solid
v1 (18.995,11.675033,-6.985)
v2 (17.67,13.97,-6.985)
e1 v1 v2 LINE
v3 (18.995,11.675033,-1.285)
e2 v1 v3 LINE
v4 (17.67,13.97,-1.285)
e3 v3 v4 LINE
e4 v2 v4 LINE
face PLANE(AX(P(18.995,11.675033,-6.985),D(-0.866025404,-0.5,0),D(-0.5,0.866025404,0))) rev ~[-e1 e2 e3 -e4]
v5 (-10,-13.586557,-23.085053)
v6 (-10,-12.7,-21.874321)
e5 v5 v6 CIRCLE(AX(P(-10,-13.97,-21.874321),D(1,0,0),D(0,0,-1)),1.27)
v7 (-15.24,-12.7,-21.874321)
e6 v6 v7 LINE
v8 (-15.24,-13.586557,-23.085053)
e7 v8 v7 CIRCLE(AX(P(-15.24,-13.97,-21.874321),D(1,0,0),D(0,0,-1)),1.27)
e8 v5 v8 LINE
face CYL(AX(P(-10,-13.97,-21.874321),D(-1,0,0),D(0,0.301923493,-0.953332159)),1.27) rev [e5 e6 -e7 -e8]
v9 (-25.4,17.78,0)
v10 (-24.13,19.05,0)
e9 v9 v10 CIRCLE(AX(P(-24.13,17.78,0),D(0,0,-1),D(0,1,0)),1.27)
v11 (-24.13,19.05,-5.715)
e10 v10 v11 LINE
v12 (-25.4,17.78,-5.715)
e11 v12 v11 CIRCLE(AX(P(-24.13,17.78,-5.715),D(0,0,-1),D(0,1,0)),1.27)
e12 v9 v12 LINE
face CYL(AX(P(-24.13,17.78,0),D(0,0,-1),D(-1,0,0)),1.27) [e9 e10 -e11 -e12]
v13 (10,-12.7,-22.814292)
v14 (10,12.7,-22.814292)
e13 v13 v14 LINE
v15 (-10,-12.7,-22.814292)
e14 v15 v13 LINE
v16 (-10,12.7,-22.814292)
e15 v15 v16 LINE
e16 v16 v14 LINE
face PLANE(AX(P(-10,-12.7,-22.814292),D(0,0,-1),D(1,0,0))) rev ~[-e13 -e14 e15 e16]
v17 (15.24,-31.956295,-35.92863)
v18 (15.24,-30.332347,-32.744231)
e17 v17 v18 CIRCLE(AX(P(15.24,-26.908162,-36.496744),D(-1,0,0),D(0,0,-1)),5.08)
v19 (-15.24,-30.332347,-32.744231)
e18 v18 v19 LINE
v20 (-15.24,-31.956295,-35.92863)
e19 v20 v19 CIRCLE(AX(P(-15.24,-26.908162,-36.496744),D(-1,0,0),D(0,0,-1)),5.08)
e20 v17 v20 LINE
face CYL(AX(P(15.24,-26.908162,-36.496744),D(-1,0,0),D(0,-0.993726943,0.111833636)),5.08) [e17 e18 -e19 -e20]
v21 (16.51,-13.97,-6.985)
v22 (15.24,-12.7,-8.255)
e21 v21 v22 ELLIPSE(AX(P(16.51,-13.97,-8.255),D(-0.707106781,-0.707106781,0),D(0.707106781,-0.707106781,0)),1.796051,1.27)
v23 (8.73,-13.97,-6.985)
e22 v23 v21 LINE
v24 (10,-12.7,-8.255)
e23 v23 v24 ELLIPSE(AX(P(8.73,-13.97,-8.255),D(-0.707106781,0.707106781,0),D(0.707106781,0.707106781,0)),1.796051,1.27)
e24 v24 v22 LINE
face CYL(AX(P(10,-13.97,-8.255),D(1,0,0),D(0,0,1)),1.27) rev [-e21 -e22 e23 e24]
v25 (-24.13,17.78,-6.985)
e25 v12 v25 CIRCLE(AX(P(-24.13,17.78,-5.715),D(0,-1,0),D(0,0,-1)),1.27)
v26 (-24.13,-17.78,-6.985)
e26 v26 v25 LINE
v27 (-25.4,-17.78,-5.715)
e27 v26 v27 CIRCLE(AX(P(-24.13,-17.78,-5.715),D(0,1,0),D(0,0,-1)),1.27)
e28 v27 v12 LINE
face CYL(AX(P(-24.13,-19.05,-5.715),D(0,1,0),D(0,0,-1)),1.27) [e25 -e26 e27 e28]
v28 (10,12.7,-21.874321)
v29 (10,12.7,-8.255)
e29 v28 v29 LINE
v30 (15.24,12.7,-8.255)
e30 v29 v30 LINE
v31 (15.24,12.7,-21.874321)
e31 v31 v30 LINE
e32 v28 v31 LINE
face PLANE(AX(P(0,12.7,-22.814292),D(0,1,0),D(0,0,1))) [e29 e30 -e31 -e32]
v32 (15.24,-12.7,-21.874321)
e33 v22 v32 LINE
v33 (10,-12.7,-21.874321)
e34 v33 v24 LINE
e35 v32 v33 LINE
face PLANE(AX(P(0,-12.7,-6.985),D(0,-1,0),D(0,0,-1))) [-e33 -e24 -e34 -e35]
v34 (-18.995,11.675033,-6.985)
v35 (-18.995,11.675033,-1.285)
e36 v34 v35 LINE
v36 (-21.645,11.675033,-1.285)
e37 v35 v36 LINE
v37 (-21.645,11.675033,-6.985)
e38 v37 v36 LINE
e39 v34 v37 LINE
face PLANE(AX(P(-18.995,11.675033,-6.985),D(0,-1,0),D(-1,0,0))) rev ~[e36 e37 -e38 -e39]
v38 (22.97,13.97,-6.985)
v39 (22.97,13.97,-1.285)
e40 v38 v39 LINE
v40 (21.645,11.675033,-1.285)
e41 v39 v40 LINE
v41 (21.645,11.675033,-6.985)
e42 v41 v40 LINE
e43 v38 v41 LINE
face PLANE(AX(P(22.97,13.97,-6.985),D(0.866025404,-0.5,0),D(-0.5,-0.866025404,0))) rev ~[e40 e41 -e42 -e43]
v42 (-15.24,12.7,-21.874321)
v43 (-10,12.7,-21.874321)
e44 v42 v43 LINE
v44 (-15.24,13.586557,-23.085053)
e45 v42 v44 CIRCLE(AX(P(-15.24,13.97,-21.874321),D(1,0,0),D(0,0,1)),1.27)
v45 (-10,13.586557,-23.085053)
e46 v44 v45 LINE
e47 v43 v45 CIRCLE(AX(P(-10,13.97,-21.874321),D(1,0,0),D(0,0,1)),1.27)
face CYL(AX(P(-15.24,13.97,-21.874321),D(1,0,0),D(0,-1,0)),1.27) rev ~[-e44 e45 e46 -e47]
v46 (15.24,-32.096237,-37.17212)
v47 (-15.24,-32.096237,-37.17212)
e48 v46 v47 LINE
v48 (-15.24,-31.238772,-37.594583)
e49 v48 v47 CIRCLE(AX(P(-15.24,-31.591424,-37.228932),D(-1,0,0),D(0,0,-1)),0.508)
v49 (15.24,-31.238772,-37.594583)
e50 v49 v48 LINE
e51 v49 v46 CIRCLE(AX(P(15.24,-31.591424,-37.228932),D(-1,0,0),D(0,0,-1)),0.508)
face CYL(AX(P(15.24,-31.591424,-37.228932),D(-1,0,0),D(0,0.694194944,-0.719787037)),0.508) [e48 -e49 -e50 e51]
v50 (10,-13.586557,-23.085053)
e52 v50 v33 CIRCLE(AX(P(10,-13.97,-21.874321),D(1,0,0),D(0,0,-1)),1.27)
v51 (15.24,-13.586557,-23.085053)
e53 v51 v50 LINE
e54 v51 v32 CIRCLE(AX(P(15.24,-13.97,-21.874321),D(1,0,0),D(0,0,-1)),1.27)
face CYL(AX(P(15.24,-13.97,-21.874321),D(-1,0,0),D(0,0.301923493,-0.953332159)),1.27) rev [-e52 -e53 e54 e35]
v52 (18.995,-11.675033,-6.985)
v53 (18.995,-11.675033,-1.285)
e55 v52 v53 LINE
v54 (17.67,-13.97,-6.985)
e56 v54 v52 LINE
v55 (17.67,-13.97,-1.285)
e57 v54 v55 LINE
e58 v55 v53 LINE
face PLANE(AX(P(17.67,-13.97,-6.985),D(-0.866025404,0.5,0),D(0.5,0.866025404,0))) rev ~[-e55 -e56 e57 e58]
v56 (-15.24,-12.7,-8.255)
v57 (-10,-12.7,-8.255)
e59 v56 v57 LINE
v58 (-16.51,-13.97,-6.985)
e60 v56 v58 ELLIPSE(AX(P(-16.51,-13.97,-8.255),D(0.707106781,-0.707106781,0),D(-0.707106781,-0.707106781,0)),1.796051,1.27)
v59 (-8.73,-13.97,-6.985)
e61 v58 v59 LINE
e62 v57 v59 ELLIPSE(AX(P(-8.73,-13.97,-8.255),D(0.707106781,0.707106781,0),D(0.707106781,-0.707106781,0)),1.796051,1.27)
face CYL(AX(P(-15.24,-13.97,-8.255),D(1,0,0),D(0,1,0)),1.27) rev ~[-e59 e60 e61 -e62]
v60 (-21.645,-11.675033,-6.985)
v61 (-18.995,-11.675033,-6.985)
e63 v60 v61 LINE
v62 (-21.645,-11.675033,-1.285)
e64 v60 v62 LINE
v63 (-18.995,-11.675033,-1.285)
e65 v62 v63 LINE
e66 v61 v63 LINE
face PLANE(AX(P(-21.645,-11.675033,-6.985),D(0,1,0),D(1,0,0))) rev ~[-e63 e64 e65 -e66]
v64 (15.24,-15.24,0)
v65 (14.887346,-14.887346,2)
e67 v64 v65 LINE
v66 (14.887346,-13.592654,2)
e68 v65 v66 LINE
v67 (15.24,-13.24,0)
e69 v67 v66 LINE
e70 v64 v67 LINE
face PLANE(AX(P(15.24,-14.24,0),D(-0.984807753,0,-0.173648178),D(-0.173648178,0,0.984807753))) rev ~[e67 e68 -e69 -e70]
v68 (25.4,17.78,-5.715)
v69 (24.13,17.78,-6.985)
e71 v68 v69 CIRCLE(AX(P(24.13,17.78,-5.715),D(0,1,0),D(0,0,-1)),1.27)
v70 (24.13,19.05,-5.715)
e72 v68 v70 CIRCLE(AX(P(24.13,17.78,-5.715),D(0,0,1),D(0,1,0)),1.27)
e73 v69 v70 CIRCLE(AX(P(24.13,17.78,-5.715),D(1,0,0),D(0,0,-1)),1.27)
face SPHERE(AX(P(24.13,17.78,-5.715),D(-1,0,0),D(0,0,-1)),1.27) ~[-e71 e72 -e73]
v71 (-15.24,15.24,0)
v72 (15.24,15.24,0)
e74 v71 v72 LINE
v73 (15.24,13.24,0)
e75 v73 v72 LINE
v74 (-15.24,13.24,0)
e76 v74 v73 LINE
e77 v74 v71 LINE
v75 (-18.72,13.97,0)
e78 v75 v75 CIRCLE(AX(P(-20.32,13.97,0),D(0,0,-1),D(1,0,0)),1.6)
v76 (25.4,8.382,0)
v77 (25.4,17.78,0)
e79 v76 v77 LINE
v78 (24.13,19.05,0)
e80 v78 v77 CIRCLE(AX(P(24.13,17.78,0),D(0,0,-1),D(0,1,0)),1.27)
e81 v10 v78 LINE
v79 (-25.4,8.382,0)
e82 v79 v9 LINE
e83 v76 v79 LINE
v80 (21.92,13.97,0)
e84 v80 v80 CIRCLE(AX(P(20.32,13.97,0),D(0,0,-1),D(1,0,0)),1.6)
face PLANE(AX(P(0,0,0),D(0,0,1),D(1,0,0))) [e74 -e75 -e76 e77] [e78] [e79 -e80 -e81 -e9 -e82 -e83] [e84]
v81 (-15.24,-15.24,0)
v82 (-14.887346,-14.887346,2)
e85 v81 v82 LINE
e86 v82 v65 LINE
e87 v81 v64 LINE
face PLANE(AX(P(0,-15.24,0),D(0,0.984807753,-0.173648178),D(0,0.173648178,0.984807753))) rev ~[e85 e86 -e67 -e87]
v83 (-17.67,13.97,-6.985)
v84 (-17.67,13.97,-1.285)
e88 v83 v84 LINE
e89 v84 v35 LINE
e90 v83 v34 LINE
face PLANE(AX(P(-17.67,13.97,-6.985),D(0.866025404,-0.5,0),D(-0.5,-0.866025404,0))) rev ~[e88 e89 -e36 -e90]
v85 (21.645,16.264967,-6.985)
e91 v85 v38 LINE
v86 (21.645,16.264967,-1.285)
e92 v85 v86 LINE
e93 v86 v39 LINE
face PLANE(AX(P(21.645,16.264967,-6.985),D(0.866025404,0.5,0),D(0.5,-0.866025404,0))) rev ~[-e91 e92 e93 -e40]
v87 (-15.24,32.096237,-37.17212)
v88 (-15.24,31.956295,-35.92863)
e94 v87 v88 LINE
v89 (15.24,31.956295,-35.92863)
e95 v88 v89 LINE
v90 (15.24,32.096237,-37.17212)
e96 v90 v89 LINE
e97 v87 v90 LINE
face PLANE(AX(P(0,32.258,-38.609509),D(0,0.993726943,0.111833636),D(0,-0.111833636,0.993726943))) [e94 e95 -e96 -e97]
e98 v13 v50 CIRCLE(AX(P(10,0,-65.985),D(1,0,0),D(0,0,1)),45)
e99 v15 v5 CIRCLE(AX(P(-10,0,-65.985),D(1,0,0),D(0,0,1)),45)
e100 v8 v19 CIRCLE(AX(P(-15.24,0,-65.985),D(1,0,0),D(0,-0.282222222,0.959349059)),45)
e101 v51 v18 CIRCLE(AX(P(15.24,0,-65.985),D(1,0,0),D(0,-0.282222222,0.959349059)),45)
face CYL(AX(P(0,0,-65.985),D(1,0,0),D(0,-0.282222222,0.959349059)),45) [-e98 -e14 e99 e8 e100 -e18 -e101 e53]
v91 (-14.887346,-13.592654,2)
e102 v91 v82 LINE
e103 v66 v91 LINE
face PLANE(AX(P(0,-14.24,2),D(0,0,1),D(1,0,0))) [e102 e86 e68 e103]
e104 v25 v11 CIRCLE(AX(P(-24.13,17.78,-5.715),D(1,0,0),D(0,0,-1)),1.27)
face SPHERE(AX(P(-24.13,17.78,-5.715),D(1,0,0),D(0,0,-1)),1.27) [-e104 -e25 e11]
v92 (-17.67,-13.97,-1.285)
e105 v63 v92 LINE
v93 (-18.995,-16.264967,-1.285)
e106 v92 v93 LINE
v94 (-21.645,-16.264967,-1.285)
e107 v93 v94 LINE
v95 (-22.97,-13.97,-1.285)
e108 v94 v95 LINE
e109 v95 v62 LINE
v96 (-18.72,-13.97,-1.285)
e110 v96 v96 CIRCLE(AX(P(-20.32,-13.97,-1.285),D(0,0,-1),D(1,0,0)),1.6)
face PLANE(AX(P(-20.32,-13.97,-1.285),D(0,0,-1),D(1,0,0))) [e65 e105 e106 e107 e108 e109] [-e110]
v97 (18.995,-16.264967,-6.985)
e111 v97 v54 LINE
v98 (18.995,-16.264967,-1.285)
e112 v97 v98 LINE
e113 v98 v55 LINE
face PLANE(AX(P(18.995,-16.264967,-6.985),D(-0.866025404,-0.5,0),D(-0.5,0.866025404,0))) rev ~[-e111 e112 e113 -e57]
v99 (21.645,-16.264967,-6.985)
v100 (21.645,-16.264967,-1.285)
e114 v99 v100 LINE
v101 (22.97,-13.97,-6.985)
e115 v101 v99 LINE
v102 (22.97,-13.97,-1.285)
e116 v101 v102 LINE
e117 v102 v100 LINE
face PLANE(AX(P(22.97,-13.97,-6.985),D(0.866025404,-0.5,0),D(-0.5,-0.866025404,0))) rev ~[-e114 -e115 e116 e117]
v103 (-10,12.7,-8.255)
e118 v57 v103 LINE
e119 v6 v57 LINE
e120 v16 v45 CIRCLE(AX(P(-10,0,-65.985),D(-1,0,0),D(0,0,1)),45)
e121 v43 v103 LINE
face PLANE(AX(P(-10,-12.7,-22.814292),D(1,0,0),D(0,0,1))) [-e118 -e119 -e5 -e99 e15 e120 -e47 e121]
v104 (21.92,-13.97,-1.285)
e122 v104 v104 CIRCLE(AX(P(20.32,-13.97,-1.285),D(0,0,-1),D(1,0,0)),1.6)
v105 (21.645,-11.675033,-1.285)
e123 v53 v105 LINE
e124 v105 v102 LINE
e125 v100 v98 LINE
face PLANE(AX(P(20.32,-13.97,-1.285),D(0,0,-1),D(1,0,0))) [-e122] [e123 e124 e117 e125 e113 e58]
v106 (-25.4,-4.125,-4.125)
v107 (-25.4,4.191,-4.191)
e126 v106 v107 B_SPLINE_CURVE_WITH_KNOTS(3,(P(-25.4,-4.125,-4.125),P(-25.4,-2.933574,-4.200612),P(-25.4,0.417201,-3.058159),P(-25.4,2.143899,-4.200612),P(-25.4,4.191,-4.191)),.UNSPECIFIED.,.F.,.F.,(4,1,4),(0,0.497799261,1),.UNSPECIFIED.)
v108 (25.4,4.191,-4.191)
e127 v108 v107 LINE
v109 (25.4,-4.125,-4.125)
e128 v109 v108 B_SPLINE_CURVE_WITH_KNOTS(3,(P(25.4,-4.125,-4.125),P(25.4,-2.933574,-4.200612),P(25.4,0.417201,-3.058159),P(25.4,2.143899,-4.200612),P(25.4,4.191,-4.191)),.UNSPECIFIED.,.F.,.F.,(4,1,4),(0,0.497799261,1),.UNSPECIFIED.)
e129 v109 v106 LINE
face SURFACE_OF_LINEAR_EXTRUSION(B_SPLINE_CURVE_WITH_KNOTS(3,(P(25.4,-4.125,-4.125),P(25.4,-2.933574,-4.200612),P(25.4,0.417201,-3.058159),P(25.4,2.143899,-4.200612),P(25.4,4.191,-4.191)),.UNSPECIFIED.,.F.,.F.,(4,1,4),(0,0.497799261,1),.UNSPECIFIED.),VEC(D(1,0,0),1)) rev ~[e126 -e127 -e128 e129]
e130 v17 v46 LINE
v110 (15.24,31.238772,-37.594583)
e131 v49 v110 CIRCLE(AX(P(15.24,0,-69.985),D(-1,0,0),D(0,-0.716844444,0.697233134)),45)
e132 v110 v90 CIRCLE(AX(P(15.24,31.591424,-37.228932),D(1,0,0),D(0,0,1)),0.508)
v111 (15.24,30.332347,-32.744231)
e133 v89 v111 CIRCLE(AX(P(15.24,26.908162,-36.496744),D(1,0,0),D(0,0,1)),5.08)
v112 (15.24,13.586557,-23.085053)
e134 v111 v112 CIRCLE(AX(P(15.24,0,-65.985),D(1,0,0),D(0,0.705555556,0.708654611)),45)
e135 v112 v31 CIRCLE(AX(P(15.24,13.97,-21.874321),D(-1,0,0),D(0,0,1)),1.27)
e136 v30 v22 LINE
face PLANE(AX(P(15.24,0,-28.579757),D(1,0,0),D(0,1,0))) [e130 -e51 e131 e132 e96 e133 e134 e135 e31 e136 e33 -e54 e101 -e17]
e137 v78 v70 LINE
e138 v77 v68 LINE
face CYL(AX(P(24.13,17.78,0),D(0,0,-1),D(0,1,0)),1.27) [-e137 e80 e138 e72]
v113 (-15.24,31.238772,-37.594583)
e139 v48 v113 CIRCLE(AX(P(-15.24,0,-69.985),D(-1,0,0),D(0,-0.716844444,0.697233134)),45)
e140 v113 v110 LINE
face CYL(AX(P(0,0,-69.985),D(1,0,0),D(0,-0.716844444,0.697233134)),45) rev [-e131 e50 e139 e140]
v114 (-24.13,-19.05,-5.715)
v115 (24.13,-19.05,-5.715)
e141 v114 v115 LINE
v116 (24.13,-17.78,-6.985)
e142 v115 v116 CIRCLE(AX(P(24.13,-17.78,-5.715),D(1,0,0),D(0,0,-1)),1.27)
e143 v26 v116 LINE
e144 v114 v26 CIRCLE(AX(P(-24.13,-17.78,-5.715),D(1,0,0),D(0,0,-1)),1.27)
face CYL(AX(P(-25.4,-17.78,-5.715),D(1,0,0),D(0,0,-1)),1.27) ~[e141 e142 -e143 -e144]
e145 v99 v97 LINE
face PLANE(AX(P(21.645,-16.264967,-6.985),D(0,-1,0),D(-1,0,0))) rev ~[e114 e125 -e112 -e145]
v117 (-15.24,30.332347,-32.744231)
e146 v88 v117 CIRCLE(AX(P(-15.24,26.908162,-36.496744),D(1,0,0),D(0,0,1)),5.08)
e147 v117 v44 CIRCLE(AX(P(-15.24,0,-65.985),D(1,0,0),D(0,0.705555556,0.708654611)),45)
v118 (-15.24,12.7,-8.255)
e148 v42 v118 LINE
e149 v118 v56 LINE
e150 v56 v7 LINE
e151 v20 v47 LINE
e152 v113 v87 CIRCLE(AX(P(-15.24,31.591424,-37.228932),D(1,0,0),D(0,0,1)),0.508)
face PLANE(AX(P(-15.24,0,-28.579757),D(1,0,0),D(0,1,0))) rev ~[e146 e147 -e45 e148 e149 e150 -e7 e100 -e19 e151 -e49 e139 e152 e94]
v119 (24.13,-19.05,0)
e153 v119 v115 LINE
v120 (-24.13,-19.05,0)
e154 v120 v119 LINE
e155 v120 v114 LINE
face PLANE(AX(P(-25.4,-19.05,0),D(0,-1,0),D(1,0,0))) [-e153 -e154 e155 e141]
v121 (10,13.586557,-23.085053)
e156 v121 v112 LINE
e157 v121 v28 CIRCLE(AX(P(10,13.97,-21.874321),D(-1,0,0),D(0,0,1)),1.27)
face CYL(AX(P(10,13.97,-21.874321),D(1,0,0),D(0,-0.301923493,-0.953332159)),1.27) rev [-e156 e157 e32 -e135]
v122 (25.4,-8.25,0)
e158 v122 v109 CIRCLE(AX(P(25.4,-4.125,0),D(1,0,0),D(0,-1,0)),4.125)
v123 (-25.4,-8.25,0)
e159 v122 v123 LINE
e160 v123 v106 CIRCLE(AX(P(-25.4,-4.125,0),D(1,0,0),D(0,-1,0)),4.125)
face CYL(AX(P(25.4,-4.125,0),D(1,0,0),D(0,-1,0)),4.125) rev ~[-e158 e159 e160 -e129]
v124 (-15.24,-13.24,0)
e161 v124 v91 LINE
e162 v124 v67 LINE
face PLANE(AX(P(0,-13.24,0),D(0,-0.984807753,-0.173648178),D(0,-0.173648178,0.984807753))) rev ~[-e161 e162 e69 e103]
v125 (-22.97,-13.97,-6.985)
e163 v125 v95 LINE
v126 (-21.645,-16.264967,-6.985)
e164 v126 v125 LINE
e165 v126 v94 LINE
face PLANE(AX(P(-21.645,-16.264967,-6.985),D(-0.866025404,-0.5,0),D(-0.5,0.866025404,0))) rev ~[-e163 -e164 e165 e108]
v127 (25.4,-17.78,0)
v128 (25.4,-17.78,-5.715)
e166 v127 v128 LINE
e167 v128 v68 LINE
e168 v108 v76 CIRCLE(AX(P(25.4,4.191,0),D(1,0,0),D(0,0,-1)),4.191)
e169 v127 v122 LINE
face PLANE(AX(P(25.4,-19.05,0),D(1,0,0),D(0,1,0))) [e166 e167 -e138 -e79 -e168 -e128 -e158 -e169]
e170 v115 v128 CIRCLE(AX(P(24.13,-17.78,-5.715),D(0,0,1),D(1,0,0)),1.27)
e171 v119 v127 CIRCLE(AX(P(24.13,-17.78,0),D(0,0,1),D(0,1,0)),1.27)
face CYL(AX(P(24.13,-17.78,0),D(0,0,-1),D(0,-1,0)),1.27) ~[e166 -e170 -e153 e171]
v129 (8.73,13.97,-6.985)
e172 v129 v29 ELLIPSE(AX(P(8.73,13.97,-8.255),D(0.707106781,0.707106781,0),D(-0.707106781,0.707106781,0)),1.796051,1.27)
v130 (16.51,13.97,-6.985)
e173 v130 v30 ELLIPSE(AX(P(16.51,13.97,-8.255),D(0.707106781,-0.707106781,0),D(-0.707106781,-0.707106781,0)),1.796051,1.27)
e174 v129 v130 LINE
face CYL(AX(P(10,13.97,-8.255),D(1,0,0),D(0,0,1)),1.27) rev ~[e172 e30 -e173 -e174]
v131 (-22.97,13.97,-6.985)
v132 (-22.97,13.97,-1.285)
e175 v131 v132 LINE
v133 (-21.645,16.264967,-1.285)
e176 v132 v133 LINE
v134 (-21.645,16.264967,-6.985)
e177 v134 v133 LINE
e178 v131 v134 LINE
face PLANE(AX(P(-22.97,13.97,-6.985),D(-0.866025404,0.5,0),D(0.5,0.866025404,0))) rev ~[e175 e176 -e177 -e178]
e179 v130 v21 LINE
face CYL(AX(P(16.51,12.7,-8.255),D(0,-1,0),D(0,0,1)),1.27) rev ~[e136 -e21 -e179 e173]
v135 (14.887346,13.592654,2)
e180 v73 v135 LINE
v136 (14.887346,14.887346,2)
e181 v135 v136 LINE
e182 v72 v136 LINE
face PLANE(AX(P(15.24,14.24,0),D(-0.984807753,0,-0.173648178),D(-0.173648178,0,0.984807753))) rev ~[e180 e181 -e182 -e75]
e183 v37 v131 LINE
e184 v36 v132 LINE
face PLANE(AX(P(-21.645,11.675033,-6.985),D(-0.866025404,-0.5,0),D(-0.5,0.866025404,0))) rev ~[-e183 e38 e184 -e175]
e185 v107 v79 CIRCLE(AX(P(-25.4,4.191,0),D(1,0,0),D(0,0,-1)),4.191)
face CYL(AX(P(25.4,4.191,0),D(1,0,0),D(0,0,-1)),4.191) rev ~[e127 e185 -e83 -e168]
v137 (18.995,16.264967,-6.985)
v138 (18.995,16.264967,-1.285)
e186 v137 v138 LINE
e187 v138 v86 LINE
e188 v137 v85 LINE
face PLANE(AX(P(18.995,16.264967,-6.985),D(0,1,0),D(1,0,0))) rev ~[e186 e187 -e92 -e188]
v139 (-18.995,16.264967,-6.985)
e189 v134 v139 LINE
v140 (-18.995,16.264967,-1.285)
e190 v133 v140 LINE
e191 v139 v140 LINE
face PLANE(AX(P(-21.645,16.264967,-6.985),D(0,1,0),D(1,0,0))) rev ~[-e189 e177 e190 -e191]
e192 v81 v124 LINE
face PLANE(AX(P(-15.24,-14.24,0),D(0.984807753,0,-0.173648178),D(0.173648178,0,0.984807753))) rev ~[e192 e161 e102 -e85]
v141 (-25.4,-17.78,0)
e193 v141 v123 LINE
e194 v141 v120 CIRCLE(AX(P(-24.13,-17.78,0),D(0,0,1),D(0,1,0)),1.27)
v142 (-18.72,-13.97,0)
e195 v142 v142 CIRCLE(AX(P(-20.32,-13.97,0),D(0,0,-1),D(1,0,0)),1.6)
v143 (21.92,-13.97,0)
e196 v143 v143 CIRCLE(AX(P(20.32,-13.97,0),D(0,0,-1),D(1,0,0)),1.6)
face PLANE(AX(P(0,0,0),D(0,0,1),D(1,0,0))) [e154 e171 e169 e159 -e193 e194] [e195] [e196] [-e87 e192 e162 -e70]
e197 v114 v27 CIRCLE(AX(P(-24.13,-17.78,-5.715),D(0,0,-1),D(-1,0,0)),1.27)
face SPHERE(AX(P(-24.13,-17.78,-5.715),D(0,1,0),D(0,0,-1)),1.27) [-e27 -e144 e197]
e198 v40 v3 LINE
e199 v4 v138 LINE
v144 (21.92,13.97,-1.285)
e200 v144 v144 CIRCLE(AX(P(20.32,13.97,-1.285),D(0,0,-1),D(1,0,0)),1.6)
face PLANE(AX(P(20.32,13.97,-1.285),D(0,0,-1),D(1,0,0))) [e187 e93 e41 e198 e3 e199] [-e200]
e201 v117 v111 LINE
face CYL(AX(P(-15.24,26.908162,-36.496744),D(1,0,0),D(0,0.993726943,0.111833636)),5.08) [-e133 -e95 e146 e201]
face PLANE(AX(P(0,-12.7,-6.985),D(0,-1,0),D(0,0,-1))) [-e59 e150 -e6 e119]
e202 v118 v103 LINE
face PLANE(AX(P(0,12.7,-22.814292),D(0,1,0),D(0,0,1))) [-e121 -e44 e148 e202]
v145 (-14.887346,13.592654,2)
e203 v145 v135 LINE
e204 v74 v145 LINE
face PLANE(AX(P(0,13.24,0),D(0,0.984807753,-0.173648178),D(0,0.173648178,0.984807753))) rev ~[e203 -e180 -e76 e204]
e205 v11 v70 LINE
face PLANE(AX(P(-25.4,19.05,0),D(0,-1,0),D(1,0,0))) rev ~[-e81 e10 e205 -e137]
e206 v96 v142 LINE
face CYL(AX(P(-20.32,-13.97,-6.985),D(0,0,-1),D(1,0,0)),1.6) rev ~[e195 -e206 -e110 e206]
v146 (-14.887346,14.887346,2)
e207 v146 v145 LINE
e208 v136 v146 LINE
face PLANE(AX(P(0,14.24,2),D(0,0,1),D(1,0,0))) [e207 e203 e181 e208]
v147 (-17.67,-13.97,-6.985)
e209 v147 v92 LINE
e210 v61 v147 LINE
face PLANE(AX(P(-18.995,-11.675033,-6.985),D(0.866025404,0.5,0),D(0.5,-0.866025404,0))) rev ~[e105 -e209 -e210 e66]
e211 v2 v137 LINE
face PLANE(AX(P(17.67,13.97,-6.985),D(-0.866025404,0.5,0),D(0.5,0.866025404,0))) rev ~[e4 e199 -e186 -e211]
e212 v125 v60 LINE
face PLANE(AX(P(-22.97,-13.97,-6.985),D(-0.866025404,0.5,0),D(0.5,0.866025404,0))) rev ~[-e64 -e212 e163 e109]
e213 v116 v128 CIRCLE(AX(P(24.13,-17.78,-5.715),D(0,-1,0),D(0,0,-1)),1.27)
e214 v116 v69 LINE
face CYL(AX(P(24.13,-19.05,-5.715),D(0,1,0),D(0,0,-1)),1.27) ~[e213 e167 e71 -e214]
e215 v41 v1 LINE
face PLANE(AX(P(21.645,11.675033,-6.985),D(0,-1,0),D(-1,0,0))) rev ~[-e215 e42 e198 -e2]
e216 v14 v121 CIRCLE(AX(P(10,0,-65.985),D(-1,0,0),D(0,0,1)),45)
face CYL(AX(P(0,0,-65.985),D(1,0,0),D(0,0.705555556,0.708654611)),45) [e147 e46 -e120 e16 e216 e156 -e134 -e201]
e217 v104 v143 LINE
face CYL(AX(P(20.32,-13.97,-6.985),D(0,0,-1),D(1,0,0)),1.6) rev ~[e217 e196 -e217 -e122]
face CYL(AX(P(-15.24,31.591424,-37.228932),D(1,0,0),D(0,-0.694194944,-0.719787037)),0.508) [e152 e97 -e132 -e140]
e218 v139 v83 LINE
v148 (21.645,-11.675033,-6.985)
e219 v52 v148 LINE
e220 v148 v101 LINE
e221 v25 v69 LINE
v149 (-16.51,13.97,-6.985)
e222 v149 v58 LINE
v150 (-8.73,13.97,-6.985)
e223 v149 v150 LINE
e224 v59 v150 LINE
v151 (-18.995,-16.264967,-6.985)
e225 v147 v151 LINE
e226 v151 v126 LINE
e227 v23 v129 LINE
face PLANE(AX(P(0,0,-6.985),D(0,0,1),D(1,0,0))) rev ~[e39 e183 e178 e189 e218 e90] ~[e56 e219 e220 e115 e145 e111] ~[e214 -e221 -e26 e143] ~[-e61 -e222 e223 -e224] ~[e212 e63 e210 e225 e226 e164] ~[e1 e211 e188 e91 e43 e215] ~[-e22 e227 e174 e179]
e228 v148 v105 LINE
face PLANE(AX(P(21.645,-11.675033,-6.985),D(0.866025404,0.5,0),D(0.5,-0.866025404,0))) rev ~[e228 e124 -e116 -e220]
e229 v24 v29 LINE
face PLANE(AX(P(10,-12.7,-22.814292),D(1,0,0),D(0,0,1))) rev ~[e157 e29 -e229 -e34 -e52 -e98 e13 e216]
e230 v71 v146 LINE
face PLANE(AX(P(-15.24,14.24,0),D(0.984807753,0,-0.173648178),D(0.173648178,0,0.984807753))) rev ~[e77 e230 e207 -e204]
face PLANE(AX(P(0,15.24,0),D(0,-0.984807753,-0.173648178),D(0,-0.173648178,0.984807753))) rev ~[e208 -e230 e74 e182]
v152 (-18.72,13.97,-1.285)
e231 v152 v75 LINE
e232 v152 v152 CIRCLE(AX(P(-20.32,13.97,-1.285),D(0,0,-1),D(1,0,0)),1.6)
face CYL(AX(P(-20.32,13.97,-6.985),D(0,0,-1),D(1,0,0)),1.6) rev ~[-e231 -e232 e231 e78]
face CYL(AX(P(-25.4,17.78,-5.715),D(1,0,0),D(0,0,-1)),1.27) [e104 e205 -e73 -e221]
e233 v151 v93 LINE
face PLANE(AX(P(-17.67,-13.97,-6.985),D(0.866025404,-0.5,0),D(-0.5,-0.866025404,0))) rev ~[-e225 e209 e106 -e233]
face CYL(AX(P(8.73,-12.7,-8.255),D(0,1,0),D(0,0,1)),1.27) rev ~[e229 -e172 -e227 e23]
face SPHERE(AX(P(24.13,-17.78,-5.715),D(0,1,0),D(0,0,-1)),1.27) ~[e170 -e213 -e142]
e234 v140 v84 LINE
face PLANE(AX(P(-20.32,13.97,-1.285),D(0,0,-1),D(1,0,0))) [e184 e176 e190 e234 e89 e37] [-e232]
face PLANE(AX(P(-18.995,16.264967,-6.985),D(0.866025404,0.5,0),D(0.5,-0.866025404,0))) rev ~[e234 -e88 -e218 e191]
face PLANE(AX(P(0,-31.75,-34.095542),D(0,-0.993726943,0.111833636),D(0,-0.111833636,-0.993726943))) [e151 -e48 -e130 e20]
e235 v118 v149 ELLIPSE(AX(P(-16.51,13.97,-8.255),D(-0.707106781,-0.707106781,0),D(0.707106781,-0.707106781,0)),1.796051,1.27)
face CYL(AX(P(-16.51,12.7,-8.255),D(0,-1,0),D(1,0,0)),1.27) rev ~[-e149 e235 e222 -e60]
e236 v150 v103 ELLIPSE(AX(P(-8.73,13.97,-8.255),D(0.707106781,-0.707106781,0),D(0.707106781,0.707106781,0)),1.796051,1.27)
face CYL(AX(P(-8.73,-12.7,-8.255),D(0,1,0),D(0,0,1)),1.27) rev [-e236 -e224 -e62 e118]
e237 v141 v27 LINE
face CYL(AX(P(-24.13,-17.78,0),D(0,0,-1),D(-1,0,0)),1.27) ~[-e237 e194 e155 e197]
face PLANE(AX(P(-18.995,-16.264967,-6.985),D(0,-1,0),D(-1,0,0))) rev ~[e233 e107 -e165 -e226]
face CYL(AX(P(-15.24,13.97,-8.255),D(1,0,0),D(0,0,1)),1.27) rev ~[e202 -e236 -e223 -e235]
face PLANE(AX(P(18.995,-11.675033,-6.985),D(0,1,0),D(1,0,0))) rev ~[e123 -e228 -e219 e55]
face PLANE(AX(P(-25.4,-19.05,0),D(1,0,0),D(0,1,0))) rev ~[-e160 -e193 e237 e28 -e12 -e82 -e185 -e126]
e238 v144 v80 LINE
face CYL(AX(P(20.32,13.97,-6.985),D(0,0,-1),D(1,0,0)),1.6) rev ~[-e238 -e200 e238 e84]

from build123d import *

# Parameters (mm, degrees)
F1_W          = 50.8
F1_H          = 38.1
F2_DEPTH      = 6.985
F4_DEPTH      = 50.8
F6_DEPTH      = 15.24
F6_DEPTH_BACK = 15.24
F7_W          = 20
F7_H          = 15.8292923384
F8_DEPTH      = 25.4
F9_R          = 1.6
F10_DEPTH     = 25.4
F11_R         = 1.6
F12_DEPTH     = 5.7
F13_W         = 30.48
F13_H         = 2
F14_DEPTH     = 2
F14_TAPER     = 10
F15_R         = 0.508
F16_R         = 5.08
F17_R         = 1.27


# Not quite as in the source:
# - two fillets or chamfers of one size are made in one step


with BuildPart() as f2:
    # F1 (on Top) → F2 (new body)
    with BuildSketch(Plane.XY):
        Rectangle(F1_W, F1_H)
    extrude(amount=-F2_DEPTH)

    # F3 (on face) → F4 (cut, through all)
    with BuildSketch(Plane.YZ.offset(25.4)):
        with BuildLine():
            add(Edge.make_bspline(
                [(-4.125, 4.125), (-2.4255892558, 4.1137489608), (-0.0276085061, 2.971292738), (2.5249406681, 4.1137612248), (4.191, 4.191)],
                knots=[0, 0, 0, 0, 0.4977710734, 1, 1, 1, 1], degree=3))
            ThreePointArc((-4.125, 4.125), (-7.0418154724, 2.9168154724), (-8.25, 0))
            ThreePointArc((-8.25, 0), (-7.0418154724, -2.9168154724), (-4.125, -4.125))
            add(Edge.make_bspline(
                [(-4.125, -4.125), (-2.9335741419, -4.2006121948), (0.4172014685, -3.0581585459), (2.1438994445, -4.2006121948), (4.191, -4.191)],
                knots=[0, 0, 0, 0, 0.497799261, 1, 1, 1, 1], degree=3))
            ThreePointArc((4.191, -4.191), (7.15448452, -2.96348452), (8.382, 0))
            ThreePointArc((8.382, 0), (7.15448452, 2.96348452), (4.191, 4.191))
        make_face()
    extrude(amount=-F4_DEPTH, mode=Mode.SUBTRACT)

    # F5 (on Right) → F6 (join, two sides)
    with BuildSketch(Plane.YZ) as f6_sk:
        with BuildLine():
            ThreePointArc((-32.258, -38.6095089919), (0, -24.985), (32.258, -38.6095089919))
            Line((32.258, -38.6095089919), (31.75, -34.0955424944))
            ThreePointArc((31.75, -34.0955424944), (22.9296157026, -27.265073299), (12.7, -22.8142923384))
            ThreePointArc((12.7, -22.8142923384), (0, -20.985), (-12.7, -22.8142923384))
            ThreePointArc((-12.7, -22.8142923384), (-22.9296157026, -27.265073299), (-31.75, -34.0955424944))
            Line((-31.75, -34.0955424944), (-32.258, -38.6095089919))
        make_face()
        with BuildLine():
            ThreePointArc((-12.7, -22.8142923384), (0, -20.985), (12.7, -22.8142923384))
            Line((12.7, -22.8142923384), (12.7, -6.985))
            Line((12.7, -6.985), (-12.7, -6.985))
            Line((-12.7, -6.985), (-12.7, -22.8142923384))
        make_face()
    extrude(amount=F6_DEPTH)
    extrude(f6_sk.sketch, amount=-F6_DEPTH_BACK)

    # F7 (on face) → F8 (cut)
    with BuildSketch(Plane.XZ.offset(12.7)):
        with Locations((0, -14.8996461692)):
            Rectangle(F7_W, F7_H)
    extrude(amount=-F8_DEPTH, mode=Mode.SUBTRACT)

    # F9 (on face) → F10 (cut)
    with BuildSketch(Plane(origin=(0, 0, -6.985), x_dir=(1, 0, 0), z_dir=(0, 0, -1))):
        with Locations((20.32, -13.97)):
            Circle(F9_R)
        with Locations((-20.32, -13.97)):
            Circle(F9_R)
        with Locations((-20.32, 13.97)):
            Circle(F9_R)
        with Locations((20.32, 13.97)):
            Circle(F9_R)
    extrude(amount=-F10_DEPTH, mode=Mode.SUBTRACT)

    # F11 (on face) → F12 (cut)
    with BuildSketch(Plane(origin=(0, 0, -6.985), x_dir=(1, 0, 0), z_dir=(0, 0, -1))):
        Polygon((21.645, -16.26496732), (22.97, -13.97), (21.645, -11.67503268), (18.995, -11.67503268), (17.67, -13.97), (18.995, -16.26496732), align=None)
        with Locations((20.32, -13.97)):
            Circle(F11_R, mode=Mode.SUBTRACT)
        Polygon((-18.995, -11.67503268), (-21.645, -11.67503268), (-22.97, -13.97), (-21.645, -16.26496732), (-18.995, -16.26496732), (-17.67, -13.97), align=None)
        with Locations((-20.32, -13.97)):
            Circle(F11_R, mode=Mode.SUBTRACT)
        Polygon((-18.995, 11.67503268), (-17.67, 13.97), (-18.995, 16.26496732), (-21.645, 16.26496732), (-22.97, 13.97), (-21.645, 11.67503268), align=None)
        with Locations((-20.32, 13.97)):
            Circle(F11_R, mode=Mode.SUBTRACT)
        Polygon((18.995, 11.67503268), (21.645, 11.67503268), (22.97, 13.97), (21.645, 16.26496732), (18.995, 16.26496732), (17.67, 13.97), align=None)
        with Locations((20.32, 13.97)):
            Circle(F11_R, mode=Mode.SUBTRACT)
    extrude(amount=-F12_DEPTH, mode=Mode.SUBTRACT)

    # F13 (on face) → F14 (join)
    with BuildSketch(Plane.XY):
        with Locations((0, 14.24)):
            Rectangle(F13_W, F13_H)
        with Locations((0, -14.24)):
            Rectangle(F13_W, F13_H)
    extrude(amount=F14_DEPTH, taper=F14_TAPER)

    # F15
    f15_edges = [f2.edges().sort_by_distance(p)[0] for p in [
        (0, 32.258, -38.609509),
        (0, -32.258, -38.609509),
    ]]
    fillet(f15_edges, radius=F15_R)

    # F16
    f16_edges = [f2.edges().sort_by_distance(p)[0] for p in [
        (0, 31.75, -34.095542),
        (0, -31.75, -34.095542),
    ]]
    fillet(f16_edges, radius=F16_R)

    # F17
    f17_edges = [f2.edges().sort_by_distance(p)[0] for p in [
        (-15.24, 0, -6.985),
        (12.62, -12.7, -22.814292),
        (-12.62, -12.7, -22.814292),
        (-12.62, -12.7, -6.985),
        (0, 19.05, -6.985),
        (25.4, 0, -6.985),
        (-25.4, 0, -6.985),
        (0, -19.05, -6.985),
        (-12.62, 12.7, -6.985),
        (-10, 0, -6.985),
        (12.62, -12.7, -6.985),
        (10, 0, -6.985),
        (15.24, 0, -6.985),
        (12.62, 12.7, -6.985),
        (-12.62, 12.7, -22.814292),
        (12.62, 12.7, -22.814292),
        (25.4, 19.05, -3.4925),
        (-25.4, 19.05, -3.4925),
        (25.4, -19.05, -3.4925),
        (-25.4, -19.05, -3.4925),
    ]]
    fillet(f17_edges, radius=F17_R)


solid = f2.part
